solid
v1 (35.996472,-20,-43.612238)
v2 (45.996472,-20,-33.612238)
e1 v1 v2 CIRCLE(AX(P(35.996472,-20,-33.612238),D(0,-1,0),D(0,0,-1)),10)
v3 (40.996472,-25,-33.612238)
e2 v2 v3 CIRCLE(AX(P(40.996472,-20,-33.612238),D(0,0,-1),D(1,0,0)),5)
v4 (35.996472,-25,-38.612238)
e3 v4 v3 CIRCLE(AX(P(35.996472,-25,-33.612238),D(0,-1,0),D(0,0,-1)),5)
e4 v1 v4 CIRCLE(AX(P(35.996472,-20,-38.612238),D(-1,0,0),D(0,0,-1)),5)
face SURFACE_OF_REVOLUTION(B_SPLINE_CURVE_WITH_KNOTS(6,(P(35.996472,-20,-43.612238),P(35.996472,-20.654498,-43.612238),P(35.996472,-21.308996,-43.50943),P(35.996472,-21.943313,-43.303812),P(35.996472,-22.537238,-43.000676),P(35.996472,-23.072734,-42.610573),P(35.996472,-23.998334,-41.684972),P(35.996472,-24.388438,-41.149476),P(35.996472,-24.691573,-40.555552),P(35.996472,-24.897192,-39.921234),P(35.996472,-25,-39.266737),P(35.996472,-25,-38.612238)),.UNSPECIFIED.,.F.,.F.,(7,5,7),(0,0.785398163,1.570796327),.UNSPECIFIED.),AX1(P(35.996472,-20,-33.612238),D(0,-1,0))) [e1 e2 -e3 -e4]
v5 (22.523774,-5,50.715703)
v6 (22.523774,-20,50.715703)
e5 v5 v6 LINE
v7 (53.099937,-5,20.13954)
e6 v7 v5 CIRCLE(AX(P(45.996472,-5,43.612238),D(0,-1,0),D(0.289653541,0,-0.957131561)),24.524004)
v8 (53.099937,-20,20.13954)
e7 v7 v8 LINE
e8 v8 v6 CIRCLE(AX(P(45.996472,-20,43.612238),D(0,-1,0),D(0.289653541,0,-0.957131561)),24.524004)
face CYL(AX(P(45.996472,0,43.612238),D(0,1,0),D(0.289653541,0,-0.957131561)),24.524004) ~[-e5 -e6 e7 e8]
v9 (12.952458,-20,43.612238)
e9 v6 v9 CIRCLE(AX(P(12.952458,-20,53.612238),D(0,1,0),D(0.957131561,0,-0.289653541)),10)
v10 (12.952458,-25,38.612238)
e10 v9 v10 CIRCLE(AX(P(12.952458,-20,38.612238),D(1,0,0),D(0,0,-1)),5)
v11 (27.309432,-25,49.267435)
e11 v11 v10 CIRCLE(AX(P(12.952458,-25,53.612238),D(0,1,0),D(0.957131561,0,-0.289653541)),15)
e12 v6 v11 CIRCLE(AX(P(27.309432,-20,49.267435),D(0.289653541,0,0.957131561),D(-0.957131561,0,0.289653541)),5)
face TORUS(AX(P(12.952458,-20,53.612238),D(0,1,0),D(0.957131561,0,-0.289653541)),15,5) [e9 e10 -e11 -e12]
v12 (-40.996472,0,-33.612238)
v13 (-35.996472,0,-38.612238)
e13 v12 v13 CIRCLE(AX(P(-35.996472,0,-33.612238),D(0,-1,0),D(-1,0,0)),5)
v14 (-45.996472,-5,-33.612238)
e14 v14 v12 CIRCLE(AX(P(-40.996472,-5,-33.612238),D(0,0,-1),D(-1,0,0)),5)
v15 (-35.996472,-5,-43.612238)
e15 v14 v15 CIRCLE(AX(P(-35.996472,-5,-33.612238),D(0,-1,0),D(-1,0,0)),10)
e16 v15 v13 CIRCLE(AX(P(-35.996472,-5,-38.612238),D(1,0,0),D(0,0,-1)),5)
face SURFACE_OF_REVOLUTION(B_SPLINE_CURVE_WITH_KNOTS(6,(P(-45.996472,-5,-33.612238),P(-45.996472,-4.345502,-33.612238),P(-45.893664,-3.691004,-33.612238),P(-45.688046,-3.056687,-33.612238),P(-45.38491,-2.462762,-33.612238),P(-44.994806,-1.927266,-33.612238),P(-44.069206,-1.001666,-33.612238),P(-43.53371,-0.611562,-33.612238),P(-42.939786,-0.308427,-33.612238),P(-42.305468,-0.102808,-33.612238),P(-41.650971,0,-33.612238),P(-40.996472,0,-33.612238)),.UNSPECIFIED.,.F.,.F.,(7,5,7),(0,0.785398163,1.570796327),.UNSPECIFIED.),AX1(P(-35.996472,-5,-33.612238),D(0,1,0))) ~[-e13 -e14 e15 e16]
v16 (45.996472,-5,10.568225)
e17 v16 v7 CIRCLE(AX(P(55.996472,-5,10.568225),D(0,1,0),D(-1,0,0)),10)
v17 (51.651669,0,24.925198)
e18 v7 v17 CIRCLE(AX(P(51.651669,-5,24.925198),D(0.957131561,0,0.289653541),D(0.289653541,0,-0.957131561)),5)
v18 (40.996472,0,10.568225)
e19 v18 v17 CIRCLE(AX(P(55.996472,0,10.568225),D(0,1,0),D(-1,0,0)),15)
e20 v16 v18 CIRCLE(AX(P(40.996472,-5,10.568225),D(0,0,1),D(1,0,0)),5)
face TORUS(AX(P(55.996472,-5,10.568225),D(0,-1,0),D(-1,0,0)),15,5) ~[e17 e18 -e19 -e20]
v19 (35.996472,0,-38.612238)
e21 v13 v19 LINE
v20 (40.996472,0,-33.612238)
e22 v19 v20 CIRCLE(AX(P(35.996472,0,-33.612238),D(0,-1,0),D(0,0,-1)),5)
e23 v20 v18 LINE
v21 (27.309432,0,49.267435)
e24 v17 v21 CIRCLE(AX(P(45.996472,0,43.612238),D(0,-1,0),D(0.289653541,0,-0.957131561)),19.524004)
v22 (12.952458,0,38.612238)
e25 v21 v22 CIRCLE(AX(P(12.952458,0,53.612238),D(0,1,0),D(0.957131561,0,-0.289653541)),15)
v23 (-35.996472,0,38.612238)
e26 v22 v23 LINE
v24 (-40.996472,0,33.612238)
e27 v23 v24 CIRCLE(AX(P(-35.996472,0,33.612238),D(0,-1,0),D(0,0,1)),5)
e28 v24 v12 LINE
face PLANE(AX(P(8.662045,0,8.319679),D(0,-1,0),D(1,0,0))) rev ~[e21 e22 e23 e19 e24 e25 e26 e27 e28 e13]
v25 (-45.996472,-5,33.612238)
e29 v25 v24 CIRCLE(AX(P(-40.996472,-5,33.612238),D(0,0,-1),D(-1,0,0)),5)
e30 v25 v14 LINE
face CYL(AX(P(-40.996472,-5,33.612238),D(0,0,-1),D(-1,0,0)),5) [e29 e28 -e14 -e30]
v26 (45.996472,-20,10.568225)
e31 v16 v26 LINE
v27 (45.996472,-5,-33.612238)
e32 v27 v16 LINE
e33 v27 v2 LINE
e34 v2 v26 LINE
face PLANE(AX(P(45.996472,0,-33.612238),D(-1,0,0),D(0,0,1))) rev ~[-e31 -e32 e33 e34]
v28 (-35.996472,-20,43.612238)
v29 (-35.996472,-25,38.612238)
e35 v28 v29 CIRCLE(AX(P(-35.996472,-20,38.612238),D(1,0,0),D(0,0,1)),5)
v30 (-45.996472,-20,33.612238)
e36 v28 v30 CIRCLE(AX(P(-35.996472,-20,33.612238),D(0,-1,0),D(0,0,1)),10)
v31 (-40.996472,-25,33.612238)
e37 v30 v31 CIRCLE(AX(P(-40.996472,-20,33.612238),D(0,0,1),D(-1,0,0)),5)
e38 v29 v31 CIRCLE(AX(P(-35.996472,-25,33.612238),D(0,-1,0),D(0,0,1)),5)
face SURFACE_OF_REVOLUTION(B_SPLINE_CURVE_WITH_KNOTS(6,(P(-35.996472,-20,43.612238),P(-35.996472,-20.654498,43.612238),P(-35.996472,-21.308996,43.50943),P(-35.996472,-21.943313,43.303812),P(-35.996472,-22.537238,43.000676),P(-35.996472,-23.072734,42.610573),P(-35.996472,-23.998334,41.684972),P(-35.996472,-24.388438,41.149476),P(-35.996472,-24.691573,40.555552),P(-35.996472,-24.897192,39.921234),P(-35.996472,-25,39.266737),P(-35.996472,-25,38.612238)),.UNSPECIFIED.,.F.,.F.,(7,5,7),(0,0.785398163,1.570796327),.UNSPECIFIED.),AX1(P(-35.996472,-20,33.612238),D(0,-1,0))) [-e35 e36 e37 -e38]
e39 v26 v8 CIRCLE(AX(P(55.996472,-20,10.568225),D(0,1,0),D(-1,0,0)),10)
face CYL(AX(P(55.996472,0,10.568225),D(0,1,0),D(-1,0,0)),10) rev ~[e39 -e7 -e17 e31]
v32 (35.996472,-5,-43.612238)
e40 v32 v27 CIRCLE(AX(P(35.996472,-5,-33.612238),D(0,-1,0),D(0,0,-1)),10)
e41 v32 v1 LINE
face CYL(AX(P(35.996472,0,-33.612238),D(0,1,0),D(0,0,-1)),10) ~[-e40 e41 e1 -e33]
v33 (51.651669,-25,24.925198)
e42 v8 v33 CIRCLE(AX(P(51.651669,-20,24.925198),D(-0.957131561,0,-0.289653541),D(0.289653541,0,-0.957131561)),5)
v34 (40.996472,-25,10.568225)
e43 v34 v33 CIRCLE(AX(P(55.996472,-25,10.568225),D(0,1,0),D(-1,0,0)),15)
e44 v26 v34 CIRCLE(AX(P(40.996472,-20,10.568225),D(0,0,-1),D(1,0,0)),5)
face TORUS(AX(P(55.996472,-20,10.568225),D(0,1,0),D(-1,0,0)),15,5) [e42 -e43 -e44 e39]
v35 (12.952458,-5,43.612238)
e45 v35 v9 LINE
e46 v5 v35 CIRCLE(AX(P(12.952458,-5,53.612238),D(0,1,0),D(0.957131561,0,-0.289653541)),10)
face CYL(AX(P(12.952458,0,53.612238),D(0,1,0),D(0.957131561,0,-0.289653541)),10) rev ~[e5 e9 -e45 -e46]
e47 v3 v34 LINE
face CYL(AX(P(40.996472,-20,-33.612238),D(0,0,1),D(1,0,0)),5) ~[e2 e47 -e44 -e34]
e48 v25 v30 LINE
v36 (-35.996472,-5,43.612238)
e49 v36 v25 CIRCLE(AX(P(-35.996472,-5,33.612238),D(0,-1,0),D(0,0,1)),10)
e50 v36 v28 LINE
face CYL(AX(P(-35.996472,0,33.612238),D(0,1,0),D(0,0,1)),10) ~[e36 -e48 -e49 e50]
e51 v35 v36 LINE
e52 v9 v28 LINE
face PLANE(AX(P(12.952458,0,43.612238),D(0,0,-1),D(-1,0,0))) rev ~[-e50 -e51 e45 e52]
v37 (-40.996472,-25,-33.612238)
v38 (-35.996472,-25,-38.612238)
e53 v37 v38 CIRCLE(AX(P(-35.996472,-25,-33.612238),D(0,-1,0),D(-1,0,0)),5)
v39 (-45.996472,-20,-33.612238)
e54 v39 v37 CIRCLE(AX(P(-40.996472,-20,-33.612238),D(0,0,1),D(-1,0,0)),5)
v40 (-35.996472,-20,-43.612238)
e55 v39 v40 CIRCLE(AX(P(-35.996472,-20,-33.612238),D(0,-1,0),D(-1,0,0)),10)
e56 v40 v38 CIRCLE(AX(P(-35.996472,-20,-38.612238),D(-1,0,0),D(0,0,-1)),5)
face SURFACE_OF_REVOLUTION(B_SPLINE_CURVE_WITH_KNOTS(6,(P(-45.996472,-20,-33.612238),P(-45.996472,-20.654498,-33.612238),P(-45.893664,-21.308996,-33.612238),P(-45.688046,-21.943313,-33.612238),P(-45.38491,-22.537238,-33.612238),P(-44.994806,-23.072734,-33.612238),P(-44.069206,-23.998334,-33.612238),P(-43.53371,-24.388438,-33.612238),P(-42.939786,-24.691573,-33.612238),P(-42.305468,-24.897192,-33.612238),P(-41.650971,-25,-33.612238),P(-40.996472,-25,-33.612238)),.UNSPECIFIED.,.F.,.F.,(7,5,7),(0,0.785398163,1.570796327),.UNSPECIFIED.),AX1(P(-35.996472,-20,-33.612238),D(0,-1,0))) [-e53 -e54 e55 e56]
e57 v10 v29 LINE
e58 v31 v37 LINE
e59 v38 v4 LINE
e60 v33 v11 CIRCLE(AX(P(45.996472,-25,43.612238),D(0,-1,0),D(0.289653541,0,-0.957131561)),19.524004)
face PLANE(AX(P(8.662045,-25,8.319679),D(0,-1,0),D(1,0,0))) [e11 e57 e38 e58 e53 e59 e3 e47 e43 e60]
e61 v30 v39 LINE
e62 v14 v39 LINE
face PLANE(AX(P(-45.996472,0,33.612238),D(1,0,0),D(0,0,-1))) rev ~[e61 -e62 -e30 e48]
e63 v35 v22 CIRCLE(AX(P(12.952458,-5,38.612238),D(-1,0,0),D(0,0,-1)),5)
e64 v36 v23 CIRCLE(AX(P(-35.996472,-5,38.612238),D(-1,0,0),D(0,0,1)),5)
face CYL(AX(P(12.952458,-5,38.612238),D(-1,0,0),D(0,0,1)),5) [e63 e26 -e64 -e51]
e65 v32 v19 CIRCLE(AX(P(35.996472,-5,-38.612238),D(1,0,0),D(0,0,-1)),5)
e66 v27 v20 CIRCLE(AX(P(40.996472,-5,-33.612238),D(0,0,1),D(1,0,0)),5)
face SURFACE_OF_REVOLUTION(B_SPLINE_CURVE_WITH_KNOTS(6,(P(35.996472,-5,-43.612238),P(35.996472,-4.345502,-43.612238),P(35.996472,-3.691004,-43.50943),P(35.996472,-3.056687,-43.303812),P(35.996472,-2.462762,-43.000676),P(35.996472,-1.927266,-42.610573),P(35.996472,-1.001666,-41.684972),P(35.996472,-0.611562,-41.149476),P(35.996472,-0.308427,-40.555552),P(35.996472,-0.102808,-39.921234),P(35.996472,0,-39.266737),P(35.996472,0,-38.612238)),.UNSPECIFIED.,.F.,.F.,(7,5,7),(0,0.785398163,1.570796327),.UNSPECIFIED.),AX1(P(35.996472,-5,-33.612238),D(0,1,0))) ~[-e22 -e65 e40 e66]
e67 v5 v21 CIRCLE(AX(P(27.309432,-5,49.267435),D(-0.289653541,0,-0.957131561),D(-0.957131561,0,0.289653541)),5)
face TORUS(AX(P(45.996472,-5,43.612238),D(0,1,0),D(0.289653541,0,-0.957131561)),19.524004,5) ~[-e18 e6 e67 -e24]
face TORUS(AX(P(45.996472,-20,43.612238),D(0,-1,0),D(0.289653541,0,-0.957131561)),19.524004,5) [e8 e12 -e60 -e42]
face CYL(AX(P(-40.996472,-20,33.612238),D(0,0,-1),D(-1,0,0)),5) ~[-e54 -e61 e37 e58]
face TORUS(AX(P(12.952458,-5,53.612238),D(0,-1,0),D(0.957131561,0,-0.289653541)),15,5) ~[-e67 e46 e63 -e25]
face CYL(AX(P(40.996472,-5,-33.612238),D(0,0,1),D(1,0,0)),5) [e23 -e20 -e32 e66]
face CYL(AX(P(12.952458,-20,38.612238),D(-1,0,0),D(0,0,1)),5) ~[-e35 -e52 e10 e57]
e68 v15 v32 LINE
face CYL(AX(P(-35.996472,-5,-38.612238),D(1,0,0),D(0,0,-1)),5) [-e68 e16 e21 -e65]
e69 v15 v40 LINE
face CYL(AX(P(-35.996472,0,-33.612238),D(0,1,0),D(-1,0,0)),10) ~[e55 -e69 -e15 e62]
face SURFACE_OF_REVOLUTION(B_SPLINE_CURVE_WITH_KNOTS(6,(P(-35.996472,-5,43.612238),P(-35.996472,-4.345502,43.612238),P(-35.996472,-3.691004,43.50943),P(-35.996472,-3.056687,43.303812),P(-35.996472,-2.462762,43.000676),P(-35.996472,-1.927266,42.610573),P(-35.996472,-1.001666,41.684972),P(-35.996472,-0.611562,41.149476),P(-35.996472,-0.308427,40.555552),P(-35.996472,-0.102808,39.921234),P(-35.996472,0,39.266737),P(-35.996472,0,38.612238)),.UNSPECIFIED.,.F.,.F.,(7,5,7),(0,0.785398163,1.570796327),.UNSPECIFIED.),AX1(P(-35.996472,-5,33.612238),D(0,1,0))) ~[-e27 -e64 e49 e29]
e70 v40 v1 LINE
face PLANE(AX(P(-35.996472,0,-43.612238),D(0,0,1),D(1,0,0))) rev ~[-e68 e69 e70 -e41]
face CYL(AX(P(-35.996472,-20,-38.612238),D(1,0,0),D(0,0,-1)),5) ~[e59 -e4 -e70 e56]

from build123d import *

# Parameters (mm, degrees)
F1_DEPTH = 25
F2_R     = 5


# Not quite as in the source:
# - the program builds the solid bodies; features that only make, move or delete a surface that nothing else refers to are left out


with BuildPart() as f1:
    # F0 (on Front) → F1 (new body)
    with BuildSketch(Plane.XZ):
        with BuildLine():
            ThreePointArc((22.5237740783, 50.7157030305), (18.9120996382, 45.5821277938), (12.9524584639, 43.6122384452))
            Line((12.9524584639, 43.6122384452), (-35.9964722395, 43.6122384452))
            ThreePointArc((-35.9964722395, 43.6122384452), (-43.0675400514, 40.6833062571), (-45.9964722395, 33.6122384452))
            Line((-45.9964722395, 33.6122384452), (-45.9964722395, -33.6122384452))
            ThreePointArc((-45.9964722395, -33.6122384452), (-43.0675400514, -40.6833062571), (-35.9964722395, -43.6122384452))
            Line((-35.9964722395, -43.6122384452), (35.9964722395, -43.6122384452))
            ThreePointArc((35.9964722395, -43.6122384452), (43.0675400514, -40.6833062571), (45.9964722395, -33.6122384452))
            Line((45.9964722395, -33.6122384452), (45.9964722395, 10.5682246696))
            ThreePointArc((45.9964722395, 10.5682246696), (47.9663615881, 16.5278658439), (53.0999368248, 20.139540284))
            ThreePointArc((53.0999368248, 20.139540284), (63.3375617105, 60.9533279162), (22.5237740783, 50.7157030305))
        make_face()
    extrude(amount=F1_DEPTH)

    # F2
    f2_edges = [f1.edges().sort_by_distance(p)[0] for p in [
        (63.337562, -25, 60.953328),
        (63.337562, 0, 60.953328),
    ]]
    fillet(f2_edges, radius=F2_R)


solid = f1.part
